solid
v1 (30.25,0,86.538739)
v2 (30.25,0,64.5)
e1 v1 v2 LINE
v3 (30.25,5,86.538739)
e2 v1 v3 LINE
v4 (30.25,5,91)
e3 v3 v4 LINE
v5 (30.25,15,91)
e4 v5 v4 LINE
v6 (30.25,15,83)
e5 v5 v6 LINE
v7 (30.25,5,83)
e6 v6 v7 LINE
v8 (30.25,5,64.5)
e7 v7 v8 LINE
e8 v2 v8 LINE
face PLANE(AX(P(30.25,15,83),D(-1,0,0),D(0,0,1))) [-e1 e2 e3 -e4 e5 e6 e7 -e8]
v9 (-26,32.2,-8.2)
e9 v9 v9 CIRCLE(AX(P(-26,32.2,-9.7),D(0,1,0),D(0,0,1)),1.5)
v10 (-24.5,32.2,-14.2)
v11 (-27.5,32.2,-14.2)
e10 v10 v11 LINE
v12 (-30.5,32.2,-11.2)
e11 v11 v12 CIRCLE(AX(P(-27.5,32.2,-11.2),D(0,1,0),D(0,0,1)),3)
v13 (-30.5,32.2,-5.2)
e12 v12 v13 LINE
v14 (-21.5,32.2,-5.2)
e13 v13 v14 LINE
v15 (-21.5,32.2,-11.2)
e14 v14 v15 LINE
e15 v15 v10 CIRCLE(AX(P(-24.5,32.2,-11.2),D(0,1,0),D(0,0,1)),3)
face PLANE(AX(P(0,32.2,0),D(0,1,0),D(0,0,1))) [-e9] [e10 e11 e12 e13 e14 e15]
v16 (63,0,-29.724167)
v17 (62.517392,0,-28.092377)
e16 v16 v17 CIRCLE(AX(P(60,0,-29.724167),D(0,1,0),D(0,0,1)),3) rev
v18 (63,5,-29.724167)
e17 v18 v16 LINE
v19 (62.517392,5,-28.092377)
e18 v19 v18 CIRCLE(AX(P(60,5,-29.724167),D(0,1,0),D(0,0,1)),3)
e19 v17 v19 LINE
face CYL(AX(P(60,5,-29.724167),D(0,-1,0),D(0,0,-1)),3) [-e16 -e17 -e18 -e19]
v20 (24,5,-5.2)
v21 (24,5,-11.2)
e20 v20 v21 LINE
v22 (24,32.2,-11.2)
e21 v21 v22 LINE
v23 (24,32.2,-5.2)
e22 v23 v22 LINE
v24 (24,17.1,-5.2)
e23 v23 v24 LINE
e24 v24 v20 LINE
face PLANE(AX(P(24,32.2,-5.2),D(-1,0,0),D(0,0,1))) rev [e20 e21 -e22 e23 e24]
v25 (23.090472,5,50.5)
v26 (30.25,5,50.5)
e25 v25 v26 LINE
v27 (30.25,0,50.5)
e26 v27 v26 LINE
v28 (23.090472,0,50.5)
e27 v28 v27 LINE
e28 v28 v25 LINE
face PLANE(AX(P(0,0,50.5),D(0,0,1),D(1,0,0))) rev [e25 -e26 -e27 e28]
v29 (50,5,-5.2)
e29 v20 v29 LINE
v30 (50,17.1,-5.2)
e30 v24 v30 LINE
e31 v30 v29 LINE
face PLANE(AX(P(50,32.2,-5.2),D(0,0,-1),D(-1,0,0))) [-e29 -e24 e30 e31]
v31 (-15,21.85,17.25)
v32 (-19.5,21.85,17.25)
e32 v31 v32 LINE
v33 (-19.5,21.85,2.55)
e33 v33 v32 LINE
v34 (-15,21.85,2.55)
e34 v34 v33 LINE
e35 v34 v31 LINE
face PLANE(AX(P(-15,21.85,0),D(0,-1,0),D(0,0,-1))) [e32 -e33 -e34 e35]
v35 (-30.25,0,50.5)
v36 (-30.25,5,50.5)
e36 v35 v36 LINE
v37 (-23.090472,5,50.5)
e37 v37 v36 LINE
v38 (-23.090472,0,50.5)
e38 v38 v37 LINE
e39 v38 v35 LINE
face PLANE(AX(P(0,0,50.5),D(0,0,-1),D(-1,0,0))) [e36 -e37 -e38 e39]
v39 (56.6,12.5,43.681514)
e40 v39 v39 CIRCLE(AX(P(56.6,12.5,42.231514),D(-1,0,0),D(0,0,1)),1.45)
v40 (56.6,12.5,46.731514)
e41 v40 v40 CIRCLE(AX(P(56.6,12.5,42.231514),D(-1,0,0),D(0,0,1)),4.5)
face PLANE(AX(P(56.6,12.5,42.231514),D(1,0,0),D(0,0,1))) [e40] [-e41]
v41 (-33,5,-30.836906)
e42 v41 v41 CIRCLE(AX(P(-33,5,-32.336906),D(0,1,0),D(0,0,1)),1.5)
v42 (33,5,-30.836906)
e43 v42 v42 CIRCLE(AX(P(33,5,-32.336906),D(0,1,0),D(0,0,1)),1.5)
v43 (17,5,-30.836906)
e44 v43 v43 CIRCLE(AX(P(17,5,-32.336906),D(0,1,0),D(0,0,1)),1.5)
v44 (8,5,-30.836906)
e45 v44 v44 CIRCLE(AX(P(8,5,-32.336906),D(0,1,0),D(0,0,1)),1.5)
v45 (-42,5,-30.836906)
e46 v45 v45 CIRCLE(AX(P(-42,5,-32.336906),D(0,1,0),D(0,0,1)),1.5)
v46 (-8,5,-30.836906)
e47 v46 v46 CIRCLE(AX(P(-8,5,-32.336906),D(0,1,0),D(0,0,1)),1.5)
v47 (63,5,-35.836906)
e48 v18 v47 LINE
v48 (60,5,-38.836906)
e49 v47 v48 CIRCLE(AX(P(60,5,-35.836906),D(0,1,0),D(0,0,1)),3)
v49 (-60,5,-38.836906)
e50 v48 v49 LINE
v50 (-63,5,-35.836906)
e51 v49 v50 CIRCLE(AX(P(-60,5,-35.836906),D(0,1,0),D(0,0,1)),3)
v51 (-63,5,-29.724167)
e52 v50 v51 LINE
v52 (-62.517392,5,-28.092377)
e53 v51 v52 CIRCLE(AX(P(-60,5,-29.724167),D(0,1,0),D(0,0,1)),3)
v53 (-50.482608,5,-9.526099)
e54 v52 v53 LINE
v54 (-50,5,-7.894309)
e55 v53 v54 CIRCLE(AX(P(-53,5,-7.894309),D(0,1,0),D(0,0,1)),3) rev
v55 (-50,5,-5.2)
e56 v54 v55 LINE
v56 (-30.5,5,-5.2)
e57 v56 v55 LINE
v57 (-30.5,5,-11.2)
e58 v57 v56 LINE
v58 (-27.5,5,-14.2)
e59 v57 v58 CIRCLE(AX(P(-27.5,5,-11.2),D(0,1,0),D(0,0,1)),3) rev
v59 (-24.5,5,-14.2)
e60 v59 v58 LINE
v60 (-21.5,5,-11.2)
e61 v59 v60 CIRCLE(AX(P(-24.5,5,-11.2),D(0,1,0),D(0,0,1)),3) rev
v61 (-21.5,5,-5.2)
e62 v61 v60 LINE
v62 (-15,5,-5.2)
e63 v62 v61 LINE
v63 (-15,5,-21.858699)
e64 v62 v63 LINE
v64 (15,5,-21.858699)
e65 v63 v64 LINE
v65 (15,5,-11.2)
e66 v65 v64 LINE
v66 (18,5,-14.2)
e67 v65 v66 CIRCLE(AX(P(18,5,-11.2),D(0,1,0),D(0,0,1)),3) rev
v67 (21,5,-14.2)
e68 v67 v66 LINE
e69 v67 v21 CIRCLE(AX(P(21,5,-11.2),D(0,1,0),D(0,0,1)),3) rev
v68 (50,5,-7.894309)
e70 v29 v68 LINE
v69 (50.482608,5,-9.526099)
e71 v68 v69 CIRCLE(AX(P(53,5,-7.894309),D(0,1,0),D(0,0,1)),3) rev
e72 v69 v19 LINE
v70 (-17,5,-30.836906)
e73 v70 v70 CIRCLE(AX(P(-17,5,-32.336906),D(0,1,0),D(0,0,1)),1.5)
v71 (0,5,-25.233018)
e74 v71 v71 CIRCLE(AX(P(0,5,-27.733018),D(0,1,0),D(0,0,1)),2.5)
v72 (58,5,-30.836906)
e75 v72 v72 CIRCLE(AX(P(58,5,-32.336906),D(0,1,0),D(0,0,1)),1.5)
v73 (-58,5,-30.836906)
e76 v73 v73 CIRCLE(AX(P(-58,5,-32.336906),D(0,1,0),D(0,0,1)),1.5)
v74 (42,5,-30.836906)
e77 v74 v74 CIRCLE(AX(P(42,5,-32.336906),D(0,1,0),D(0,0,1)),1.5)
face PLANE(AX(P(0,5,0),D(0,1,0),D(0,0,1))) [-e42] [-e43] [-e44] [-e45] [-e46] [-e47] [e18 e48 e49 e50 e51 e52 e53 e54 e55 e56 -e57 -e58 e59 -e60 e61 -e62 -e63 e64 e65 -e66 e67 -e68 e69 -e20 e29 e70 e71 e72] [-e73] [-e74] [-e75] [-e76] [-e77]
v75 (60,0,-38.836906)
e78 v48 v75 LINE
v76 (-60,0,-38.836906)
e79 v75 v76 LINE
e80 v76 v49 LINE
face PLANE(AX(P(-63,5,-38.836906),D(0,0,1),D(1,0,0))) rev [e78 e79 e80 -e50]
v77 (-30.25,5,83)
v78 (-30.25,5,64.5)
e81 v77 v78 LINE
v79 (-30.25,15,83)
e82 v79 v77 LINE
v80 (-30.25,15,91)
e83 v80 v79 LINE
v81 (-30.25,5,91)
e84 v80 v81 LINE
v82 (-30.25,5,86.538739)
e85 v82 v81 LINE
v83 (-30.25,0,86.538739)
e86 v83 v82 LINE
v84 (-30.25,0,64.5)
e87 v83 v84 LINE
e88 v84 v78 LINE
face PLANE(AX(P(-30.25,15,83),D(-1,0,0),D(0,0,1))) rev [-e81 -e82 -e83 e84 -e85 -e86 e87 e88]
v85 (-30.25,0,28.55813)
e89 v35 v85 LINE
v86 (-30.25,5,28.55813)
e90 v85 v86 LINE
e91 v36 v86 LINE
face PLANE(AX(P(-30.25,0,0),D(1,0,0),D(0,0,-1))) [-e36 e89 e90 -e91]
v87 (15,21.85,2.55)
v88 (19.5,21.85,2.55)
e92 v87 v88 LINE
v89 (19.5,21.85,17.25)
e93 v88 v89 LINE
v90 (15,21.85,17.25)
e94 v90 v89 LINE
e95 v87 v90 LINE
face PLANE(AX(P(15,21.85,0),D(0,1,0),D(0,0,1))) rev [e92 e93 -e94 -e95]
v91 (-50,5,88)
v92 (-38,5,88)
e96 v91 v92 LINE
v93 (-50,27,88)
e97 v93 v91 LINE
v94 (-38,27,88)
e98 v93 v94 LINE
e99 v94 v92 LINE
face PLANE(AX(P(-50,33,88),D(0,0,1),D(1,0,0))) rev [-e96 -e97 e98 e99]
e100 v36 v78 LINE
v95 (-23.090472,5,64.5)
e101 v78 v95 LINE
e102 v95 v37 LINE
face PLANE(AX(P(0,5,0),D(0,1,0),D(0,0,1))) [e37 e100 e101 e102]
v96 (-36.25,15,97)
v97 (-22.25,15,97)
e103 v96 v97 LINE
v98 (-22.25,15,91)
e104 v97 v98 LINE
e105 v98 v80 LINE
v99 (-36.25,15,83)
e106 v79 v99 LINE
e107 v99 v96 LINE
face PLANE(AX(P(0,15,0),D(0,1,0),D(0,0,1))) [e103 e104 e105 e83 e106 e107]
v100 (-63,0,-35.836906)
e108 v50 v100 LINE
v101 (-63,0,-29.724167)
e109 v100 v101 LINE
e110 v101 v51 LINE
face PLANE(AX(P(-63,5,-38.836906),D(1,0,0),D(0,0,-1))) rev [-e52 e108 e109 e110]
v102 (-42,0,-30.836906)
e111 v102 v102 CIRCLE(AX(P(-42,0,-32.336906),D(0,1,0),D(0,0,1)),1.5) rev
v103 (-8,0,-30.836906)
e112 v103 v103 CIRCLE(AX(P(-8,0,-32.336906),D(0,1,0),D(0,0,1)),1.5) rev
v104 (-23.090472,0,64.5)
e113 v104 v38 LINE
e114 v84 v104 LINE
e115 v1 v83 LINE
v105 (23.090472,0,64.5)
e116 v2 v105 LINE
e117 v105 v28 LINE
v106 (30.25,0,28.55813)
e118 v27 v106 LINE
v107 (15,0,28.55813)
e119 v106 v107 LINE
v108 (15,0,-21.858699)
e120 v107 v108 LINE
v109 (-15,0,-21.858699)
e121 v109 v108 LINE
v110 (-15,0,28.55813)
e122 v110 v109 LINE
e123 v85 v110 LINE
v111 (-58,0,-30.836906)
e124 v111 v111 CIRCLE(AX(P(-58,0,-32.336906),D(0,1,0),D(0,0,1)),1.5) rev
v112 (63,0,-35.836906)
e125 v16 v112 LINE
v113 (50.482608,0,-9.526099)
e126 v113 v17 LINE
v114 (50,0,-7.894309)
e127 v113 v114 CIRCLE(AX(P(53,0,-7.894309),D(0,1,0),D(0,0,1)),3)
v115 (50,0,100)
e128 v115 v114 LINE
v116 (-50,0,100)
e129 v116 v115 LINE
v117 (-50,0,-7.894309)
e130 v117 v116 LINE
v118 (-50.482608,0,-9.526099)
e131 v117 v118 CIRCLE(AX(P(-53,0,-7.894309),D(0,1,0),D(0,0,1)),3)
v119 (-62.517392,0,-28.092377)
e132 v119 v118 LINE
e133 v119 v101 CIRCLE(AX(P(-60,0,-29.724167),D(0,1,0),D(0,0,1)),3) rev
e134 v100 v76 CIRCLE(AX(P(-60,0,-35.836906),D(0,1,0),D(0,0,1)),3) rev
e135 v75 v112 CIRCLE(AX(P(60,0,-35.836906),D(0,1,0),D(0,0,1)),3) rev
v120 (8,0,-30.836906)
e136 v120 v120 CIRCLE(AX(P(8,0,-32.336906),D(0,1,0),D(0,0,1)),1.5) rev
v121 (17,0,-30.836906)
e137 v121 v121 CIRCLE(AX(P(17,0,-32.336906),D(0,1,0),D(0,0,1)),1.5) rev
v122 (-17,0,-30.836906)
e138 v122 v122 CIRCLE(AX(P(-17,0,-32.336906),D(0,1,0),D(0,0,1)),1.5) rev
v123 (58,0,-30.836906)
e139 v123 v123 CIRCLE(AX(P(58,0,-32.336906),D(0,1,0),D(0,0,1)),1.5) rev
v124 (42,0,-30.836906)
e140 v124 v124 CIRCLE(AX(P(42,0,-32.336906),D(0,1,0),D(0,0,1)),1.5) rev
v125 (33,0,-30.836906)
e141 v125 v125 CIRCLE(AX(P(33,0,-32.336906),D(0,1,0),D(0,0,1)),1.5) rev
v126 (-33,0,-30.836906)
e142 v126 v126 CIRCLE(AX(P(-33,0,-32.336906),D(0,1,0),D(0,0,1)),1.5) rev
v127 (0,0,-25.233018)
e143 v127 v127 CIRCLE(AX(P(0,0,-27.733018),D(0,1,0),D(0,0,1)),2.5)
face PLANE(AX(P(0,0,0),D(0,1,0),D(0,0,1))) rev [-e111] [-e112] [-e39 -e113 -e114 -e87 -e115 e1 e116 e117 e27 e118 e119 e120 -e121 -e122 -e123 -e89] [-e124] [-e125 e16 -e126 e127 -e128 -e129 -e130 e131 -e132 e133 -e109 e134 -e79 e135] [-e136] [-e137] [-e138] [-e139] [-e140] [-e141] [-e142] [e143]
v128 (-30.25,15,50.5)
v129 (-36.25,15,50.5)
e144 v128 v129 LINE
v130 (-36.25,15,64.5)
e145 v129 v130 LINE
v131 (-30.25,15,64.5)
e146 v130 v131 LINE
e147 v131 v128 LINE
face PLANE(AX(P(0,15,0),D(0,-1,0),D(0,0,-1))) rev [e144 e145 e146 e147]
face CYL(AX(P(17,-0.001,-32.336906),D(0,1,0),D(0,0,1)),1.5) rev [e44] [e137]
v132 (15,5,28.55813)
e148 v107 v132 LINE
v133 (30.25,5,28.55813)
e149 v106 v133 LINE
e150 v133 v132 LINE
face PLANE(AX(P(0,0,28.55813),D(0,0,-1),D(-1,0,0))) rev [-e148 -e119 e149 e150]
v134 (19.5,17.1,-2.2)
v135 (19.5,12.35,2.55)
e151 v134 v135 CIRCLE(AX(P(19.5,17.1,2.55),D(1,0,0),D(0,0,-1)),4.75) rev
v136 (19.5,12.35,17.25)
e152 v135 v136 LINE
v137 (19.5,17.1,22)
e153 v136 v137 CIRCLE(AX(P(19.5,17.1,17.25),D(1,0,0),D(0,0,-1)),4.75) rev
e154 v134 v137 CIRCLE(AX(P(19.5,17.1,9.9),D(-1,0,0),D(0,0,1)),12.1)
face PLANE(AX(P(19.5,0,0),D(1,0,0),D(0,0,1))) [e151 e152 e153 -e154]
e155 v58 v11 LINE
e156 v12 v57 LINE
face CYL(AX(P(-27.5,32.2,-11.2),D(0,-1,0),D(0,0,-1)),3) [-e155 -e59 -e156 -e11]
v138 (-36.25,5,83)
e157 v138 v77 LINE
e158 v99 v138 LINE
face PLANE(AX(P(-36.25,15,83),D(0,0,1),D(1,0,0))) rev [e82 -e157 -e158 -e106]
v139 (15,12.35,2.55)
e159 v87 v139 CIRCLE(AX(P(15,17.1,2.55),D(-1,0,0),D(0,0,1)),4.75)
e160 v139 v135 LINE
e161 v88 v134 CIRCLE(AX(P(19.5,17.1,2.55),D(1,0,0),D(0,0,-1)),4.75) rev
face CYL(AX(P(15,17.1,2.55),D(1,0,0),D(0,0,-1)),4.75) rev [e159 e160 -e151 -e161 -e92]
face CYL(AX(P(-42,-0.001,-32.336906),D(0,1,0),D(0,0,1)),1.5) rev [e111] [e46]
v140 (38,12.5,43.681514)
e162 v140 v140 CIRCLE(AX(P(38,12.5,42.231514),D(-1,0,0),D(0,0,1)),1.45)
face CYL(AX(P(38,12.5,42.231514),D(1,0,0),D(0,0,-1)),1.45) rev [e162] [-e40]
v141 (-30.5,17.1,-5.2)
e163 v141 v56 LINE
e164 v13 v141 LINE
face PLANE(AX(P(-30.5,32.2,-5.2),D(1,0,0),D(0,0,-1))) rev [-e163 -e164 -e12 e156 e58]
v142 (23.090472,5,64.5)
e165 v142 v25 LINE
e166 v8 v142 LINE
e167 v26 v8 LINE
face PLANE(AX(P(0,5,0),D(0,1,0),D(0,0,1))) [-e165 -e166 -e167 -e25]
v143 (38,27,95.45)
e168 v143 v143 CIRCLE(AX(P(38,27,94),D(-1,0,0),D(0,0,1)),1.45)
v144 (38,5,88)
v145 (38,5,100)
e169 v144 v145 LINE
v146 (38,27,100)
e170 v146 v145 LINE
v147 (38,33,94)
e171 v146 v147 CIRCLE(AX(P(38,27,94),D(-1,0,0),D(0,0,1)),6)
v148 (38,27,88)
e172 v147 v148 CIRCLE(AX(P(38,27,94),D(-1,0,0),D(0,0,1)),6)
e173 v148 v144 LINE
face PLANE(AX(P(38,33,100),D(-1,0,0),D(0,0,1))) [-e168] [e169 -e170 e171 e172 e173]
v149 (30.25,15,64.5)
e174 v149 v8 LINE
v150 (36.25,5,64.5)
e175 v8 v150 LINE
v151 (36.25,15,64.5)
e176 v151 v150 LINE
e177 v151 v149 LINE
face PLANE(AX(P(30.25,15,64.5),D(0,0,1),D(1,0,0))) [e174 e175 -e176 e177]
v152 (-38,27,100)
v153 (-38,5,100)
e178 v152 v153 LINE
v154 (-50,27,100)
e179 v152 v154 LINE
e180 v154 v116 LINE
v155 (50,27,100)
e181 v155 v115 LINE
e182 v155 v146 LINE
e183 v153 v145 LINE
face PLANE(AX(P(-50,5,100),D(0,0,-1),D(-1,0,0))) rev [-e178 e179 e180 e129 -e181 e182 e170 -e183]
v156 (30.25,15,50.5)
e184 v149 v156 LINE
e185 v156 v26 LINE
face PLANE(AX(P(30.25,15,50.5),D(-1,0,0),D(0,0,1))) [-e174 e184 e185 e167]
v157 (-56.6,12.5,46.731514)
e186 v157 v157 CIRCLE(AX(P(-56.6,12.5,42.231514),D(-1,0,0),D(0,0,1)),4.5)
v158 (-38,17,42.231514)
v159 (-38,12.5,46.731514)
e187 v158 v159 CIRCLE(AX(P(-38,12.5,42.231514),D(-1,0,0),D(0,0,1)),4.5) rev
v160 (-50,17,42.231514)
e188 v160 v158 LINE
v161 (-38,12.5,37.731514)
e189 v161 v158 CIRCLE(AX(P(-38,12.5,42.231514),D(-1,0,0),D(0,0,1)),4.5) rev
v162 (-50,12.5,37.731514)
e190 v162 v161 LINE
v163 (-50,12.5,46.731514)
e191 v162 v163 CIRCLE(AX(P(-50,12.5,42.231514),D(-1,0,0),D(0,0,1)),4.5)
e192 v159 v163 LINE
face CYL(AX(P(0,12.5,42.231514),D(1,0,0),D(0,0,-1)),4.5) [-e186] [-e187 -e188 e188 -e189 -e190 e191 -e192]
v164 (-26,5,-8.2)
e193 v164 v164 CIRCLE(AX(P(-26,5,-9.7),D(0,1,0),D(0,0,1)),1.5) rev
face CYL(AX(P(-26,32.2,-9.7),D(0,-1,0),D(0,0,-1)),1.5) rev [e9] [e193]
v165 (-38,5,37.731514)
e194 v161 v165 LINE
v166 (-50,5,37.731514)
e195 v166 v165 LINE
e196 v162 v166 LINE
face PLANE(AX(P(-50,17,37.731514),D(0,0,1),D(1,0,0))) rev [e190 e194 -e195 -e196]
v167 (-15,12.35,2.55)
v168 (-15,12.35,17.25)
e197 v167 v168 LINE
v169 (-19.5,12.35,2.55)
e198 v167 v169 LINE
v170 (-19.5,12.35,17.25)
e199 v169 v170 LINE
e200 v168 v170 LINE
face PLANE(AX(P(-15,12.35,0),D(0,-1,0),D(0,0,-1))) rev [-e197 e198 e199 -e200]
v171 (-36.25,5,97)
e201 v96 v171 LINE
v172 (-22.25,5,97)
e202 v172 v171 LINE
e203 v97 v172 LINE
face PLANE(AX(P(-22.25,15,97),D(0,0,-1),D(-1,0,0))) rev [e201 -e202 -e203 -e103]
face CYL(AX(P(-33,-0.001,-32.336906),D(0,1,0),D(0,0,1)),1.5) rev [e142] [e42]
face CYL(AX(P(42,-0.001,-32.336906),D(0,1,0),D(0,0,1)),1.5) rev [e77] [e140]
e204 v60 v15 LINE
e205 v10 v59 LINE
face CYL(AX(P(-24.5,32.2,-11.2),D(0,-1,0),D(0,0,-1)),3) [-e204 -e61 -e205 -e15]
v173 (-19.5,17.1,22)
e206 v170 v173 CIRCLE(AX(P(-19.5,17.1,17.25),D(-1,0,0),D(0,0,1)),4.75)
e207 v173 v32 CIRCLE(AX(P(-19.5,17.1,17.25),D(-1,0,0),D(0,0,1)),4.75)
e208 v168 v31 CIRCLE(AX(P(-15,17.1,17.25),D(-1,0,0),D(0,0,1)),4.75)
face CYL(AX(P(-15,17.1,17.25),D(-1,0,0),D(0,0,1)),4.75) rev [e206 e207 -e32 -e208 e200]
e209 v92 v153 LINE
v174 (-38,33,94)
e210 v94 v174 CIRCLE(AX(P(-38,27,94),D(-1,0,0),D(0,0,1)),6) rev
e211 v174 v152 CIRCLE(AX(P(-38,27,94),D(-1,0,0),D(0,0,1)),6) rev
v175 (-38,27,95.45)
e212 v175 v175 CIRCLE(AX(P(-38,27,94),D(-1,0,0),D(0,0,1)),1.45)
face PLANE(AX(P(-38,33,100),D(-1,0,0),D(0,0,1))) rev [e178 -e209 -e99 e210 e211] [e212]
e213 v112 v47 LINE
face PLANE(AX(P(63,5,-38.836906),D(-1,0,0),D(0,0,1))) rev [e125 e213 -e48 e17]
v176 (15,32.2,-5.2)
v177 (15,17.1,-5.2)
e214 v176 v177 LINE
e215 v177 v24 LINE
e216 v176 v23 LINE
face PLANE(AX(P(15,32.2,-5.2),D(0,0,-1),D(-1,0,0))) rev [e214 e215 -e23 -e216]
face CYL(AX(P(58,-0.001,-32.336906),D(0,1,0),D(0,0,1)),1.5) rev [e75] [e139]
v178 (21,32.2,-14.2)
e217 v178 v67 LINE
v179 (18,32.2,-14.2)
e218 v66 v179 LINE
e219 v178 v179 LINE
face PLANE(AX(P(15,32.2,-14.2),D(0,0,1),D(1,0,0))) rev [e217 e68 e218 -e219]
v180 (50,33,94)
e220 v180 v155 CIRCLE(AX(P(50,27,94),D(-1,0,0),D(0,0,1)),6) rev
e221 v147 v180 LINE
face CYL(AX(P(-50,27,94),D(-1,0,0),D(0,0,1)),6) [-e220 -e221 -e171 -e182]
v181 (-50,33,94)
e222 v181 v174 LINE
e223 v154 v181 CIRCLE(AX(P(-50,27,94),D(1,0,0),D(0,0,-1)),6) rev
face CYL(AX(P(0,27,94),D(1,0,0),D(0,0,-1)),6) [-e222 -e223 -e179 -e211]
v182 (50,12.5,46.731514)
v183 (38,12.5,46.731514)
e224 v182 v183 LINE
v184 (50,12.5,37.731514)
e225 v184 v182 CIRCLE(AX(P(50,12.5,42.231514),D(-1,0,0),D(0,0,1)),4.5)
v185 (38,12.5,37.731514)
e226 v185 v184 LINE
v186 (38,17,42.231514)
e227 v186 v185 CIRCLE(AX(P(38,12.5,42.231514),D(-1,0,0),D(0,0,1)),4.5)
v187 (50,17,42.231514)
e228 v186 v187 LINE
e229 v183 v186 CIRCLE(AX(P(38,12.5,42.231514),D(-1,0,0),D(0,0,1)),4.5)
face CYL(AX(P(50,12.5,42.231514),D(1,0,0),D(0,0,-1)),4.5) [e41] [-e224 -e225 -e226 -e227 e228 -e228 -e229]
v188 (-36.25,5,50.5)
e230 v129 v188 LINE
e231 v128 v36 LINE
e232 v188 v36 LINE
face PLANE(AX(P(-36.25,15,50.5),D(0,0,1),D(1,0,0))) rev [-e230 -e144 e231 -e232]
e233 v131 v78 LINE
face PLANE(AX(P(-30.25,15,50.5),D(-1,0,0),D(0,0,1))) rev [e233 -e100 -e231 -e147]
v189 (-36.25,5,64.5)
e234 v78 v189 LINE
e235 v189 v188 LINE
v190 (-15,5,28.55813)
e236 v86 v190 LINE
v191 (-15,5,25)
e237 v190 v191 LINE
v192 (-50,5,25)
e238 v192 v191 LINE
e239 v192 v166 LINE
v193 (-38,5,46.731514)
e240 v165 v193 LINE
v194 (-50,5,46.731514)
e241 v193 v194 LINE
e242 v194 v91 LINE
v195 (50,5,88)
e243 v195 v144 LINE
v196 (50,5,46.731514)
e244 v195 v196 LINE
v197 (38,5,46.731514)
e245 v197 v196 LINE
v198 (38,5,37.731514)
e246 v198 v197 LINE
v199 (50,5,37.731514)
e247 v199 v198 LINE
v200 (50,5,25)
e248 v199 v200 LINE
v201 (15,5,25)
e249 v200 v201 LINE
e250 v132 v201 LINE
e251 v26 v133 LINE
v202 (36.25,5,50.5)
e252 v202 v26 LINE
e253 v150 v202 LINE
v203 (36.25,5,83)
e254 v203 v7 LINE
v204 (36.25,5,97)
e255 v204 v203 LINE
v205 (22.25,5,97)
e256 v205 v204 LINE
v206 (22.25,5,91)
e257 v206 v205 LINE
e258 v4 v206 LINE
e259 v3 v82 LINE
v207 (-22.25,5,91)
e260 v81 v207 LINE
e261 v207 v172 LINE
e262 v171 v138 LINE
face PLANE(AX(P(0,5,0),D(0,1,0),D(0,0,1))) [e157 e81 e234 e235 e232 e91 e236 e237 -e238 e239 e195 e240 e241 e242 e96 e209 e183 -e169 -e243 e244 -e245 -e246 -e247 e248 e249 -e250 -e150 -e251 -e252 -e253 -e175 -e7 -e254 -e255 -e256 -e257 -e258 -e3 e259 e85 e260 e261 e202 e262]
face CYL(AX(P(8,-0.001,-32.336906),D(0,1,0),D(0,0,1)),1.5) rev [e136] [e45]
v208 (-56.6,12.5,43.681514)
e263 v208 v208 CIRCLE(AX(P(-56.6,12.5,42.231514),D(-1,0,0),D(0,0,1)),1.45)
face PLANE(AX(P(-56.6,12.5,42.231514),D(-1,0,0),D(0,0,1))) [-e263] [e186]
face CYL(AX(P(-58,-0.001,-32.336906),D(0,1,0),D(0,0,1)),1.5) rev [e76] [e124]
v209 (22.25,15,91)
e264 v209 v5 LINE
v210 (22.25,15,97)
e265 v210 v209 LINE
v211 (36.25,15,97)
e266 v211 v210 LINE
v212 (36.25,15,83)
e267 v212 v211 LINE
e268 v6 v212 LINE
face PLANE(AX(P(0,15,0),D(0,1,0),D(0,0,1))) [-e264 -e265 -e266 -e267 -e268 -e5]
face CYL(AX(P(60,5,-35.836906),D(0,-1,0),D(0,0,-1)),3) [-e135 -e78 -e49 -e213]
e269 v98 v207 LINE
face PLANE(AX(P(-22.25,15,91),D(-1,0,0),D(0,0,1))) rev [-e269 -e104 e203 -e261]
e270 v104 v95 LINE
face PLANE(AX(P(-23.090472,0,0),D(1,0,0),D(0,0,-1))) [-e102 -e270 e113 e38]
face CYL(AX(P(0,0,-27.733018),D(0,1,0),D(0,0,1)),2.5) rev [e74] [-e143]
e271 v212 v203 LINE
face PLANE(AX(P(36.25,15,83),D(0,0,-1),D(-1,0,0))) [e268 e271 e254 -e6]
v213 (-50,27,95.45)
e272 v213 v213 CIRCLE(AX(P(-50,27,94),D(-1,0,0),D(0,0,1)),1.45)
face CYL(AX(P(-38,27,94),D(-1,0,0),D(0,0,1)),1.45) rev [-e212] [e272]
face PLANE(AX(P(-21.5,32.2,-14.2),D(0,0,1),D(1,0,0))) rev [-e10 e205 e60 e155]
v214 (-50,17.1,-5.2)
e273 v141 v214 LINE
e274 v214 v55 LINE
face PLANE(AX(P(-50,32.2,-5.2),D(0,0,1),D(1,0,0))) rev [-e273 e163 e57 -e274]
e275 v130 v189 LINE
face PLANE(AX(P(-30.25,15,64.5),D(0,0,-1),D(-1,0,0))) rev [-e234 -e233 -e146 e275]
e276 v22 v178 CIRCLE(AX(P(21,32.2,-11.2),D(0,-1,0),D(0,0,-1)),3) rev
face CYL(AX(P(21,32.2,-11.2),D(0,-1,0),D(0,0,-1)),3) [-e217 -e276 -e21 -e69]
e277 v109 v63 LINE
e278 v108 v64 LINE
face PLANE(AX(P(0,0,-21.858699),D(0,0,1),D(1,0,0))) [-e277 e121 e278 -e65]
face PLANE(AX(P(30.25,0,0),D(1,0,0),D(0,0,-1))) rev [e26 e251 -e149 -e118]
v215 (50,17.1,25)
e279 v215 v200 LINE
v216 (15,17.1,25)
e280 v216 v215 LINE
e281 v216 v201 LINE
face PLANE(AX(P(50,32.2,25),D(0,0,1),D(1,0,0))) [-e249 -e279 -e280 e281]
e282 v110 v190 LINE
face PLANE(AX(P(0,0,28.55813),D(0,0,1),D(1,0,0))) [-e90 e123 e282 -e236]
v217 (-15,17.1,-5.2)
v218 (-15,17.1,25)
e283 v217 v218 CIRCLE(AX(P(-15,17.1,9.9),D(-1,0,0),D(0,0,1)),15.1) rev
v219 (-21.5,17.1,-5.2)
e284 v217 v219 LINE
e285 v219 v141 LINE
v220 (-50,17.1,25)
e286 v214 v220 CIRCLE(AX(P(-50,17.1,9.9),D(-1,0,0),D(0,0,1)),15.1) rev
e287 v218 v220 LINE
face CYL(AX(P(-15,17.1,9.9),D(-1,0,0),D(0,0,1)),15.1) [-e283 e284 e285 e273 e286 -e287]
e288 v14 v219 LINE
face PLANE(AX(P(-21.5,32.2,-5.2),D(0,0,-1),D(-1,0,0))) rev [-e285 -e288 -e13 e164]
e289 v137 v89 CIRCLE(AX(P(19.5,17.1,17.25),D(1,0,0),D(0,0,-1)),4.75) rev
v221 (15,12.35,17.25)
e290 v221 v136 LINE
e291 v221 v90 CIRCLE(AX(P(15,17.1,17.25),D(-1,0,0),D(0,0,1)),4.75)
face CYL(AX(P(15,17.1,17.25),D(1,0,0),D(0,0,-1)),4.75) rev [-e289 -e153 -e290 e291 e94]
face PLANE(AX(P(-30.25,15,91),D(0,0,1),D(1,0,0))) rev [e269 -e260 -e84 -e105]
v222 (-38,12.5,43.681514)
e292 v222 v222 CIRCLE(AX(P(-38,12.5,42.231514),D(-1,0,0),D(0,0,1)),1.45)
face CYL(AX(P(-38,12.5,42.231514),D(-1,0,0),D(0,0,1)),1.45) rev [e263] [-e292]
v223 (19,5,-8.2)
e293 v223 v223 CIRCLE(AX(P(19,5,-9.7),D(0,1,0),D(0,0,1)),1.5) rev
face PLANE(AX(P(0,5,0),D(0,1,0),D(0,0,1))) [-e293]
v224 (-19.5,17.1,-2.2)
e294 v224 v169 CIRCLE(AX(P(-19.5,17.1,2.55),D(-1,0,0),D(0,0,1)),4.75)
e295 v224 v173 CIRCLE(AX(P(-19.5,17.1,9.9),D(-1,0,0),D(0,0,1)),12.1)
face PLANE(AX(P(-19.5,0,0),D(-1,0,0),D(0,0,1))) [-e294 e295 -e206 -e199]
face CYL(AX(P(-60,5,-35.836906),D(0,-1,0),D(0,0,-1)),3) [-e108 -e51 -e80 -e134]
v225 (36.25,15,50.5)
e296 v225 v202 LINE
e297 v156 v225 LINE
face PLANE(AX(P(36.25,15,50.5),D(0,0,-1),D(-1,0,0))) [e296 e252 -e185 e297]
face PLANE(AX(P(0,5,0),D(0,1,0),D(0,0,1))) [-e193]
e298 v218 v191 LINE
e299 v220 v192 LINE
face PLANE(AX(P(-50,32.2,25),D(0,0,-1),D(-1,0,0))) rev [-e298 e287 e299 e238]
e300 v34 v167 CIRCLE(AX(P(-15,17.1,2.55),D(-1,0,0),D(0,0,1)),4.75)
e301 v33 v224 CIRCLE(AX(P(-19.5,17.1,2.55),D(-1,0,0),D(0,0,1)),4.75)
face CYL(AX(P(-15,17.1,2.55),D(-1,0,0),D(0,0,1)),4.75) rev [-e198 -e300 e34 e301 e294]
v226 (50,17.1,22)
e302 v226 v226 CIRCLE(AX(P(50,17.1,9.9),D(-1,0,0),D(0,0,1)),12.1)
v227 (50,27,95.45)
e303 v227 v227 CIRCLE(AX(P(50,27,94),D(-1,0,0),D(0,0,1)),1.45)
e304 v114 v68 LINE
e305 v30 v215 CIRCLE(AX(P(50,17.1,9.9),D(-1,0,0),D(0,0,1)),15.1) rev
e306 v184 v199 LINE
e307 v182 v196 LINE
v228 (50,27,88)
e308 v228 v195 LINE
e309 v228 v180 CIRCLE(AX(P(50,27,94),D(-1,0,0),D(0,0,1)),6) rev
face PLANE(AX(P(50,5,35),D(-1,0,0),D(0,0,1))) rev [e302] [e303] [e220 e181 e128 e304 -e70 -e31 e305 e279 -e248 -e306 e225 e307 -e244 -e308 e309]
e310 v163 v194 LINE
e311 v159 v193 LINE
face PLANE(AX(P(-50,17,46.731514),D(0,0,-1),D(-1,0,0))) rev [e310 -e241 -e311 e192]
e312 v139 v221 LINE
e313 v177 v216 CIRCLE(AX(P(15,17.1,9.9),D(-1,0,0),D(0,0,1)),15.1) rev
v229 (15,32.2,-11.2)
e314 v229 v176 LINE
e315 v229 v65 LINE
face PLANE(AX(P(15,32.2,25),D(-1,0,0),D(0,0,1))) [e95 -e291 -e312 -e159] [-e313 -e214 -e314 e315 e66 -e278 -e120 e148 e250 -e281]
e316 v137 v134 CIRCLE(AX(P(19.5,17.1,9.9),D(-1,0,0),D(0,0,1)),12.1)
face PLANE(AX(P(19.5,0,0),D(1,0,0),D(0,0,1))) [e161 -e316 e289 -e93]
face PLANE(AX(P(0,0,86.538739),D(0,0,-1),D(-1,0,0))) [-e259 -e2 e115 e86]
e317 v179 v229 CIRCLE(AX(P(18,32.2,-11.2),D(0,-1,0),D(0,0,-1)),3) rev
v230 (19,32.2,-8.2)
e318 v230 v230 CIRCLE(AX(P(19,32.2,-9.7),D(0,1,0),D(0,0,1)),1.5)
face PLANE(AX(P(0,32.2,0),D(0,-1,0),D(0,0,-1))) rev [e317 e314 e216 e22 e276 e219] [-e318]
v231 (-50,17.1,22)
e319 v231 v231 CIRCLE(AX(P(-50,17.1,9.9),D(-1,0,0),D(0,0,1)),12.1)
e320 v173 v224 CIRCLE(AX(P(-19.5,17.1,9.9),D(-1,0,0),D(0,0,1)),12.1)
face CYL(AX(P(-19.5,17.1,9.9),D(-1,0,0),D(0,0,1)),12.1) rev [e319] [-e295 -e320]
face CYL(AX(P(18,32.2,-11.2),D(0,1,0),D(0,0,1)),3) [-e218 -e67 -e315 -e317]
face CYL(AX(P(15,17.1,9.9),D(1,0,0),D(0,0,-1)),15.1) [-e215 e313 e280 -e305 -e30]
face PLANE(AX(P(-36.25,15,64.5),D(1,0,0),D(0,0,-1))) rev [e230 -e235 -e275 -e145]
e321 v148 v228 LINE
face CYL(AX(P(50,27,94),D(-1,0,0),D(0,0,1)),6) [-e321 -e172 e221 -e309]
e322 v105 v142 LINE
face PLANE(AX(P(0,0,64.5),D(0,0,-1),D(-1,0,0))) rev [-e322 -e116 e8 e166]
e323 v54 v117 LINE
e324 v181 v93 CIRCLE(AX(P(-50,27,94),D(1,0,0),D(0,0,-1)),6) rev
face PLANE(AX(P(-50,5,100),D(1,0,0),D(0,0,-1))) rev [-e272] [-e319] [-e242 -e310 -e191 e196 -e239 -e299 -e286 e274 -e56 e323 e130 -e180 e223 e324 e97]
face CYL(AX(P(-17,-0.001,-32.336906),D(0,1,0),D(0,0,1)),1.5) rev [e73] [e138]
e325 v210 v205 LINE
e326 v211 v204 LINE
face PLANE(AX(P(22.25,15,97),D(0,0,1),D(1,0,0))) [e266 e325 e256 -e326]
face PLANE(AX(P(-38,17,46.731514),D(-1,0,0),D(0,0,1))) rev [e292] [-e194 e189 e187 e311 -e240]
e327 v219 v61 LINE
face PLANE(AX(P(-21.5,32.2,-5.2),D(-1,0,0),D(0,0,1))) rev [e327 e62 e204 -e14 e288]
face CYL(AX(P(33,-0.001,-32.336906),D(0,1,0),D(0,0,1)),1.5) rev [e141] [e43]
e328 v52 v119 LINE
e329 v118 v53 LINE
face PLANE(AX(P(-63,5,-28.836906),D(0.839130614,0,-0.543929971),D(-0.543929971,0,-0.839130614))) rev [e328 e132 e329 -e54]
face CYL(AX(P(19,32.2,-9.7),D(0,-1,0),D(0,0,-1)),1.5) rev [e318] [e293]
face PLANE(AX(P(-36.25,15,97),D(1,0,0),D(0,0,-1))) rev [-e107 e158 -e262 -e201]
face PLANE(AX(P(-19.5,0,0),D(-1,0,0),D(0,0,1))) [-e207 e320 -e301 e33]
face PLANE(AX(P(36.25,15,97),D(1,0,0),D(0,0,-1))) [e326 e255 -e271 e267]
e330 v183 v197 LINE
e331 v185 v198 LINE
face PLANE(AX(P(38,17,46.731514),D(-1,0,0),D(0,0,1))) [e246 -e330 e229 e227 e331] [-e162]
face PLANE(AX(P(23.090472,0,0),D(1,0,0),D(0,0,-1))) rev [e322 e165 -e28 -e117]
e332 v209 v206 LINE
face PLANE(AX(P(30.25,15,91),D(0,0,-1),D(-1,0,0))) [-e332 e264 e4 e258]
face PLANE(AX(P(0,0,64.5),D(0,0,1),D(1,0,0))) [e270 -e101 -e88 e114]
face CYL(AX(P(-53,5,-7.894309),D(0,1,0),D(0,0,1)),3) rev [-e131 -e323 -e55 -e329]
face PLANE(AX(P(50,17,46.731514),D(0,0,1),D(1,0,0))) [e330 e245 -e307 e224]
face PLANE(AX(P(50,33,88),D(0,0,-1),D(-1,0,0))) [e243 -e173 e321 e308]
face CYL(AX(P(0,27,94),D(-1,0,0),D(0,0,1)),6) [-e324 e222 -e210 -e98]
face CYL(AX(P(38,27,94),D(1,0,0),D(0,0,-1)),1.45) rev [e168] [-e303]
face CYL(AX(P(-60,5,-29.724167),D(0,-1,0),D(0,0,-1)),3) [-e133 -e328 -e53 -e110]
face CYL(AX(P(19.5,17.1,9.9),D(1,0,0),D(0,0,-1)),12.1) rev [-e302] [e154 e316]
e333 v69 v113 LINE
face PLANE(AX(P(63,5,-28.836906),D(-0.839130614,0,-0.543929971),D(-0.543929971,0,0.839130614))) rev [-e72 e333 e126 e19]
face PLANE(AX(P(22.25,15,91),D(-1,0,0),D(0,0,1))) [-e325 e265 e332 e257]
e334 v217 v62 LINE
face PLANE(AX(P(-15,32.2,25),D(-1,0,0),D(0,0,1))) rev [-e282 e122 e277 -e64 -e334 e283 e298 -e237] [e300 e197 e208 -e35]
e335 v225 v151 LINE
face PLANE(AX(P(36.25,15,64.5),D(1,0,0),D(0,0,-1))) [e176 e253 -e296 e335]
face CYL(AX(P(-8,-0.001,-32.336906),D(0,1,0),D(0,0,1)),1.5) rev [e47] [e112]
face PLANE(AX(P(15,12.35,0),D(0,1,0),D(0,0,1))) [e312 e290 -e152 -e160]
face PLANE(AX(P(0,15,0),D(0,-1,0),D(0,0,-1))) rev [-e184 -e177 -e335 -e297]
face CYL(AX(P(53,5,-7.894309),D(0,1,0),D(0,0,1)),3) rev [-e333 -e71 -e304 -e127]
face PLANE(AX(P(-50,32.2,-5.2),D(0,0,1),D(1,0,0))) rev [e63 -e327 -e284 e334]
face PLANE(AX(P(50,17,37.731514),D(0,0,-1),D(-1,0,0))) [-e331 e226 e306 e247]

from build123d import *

# Parameters (mm, degrees)
BOSS_EXTRUDE1_DEPTH    = 5
FILLET1_R              = 3
SKETCH3_W              = 35
SKETCH3_H              = 30.2
BOSS_EXTRUDE2_DEPTH    = 27.2
CUT_EXTRUDE1_START     = -50
CUT_EXTRUDE1_DEPTH     = 35
CUT_EXTRUDE2_START     = -50
CUT_EXTRUDE2_OUTLINE_R = 12.1
CUT_EXTRUDE2_DEPTH     = 30.5
CUT_EXTRUDE3_DEPTH     = 35
SKETCH6_W              = 12
SKETCH6_H              = 9
BOSS_EXTRUDE3_DEPTH    = 17
FILLET2_R              = 4.5
SKETCH9_R              = 4.5
BOSS_EXTRUDE5_DEPTH    = 6.6
SKETCH10_R             = 1.45
CUT_EXTRUDE5_DEPTH     = 18.6
FILLET2_OF_MIRROR11_R  = 4.5
SKETCH11_W             = 12
SKETCH11_H             = 12
BOSS_EXTRUDE6_DEPTH    = 33
FILLET3_R              = 6
SKETCH12_R             = 1.45
CUT_EXTRUDE6_DEPTH     = 12
FILLET3_OF_MIRROR12_R  = 6
BOSS_EXTRUDE8_DEPTH    = 15
SKETCH16_W             = 6
SKETCH16_H             = 14
BOSS_EXTRUDE9_DEPTH    = 15
CUT_EXTRUDE7_REACH     = 123.462
SKETCH17_R             = 1.5
CUT_EXTRUDE8_DEPTH     = 122.461928192
SKETCH19_R             = 2.5
CUT_EXTRUDE9_DEPTH     = 122.461928192
SKETCH22_W             = 9
SKETCH22_H             = 9
SKETCH22_R             = 1.5
BOSS_EXTRUDE11_DEPTH   = 27.2
FILLET4_R              = 3


# Read off the part's stored shape, not the designer's step: Cut-Extrude1, Cut-Extrude2
with BuildPart() as part:
    # Sketch1 → Boss-Extrude1 (new body)
    with BuildSketch(Plane(origin=(0, 0, 0), x_dir=(1, 0, 0), z_dir=(0, 1, 0))):
        Polygon((-50, -100), (50, -100), (50, -50), (50, -35), (50, 8.781570318), (63, 28.83690568), (63, 38.83690568), (50, 38.83690568), (-50, 38.83690568), (-63, 38.83690568), (-63, 28.83690568), (-50, 8.781570318), (-50, -35), (-50, -50), align=None)
    extrude(amount=BOSS_EXTRUDE1_DEPTH)

    # Fillet1
    fillet1_edges = [part.edges().sort_by_distance(p)[0] for p in [
        (63, 2.5, -38.83690568),
        (63, 2.5, -28.83690568),
        (50, 2.5, -8.781570318),
        (-50, 2.5, -8.781570318),
        (-63, 2.5, -28.83690568),
        (-63, 2.5, -38.83690568),
    ]]
    fillet(fillet1_edges, radius=FILLET1_R)

    # Sketch3 → Boss-Extrude2 (add)
    with BuildSketch(Plane(origin=(0, 5, 0), x_dir=(1, 0, 0), z_dir=(0, 1, 0))):
        with Locations((-32.5, -9.9)):
            Rectangle(SKETCH3_W, SKETCH3_H)
    boss_extrude2 = extrude(amount=BOSS_EXTRUDE2_DEPTH)

    # Cut-Extrude1 outline → Cut-Extrude1 (cut)
    with BuildSketch(Plane.YZ.offset(CUT_EXTRUDE1_START)):
        with BuildLine():
            Line((32.2, 25), (17.1, 25))
            ThreePointArc((17.1, 25), (27.777312396, 20.577312396), (32.2, 9.9))
            Line((32.2, 9.9), (32.2, 25))
        make_face()
        with BuildLine():
            Line((32.2, -5.2), (32.2, 9.9))
            ThreePointArc((32.2, 9.9), (27.777312396, -0.777312396), (17.1, -5.2))
            Line((17.1, -5.2), (32.2, -5.2))
        make_face()
    cut_extrude1 = extrude(amount=CUT_EXTRUDE1_DEPTH, mode=Mode.SUBTRACT)

    # Cut-Extrude2 outline → Cut-Extrude2 (cut)
    with BuildSketch(Plane.YZ.offset(CUT_EXTRUDE2_START)):
        with Locations((17.1, 9.9)):
            Circle(CUT_EXTRUDE2_OUTLINE_R)
    cut_extrude2 = extrude(amount=CUT_EXTRUDE2_DEPTH, mode=Mode.SUBTRACT)

    # Sketch4<4> → Cut-Extrude3 (cut)
    with BuildSketch(Plane.ZY.offset(50)):
        with BuildLine():
            Line((2.55, 21.85), (17.25, 21.85))
            ThreePointArc((17.25, 21.85), (22, 17.1), (17.25, 12.35))
            Line((17.25, 12.35), (2.55, 12.35))
            ThreePointArc((2.55, 12.35), (-2.2, 17.1), (2.55, 21.85))
        make_face()
    cut_extrude3 = extrude(amount=-CUT_EXTRUDE3_DEPTH, mode=Mode.SUBTRACT)

    # Mirror16: Boss-Extrude2, Cut-Extrude1, Cut-Extrude2, Cut-Extrude3 across plane
    add(boss_extrude2.mirror(Plane(origin=(0, 0, 0), x_dir=(0, 0, 1), z_dir=(1, 0, 0))))
    add(cut_extrude1.mirror(Plane(origin=(0, 0, 0), x_dir=(0, 0, 1), z_dir=(1, 0, 0))), mode=Mode.SUBTRACT)
    add(cut_extrude2.mirror(Plane(origin=(0, 0, 0), x_dir=(0, 0, 1), z_dir=(1, 0, 0))), mode=Mode.SUBTRACT)
    add(cut_extrude3.mirror(Plane(origin=(0, 0, 0), x_dir=(0, 0, 1), z_dir=(1, 0, 0))), mode=Mode.SUBTRACT)

    # Sketch6 → Boss-Extrude3 (add)
    with BuildSketch(Plane(origin=(0, 0, 0), x_dir=(1, 0, 0), z_dir=(0, 1, 0))):
        with Locations((-44, -42.231514294)):
            Rectangle(SKETCH6_W, SKETCH6_H)
    boss_extrude3 = extrude(amount=BOSS_EXTRUDE3_DEPTH)

    # Fillet2
    fillet2_edges = [part.edges().sort_by_distance(p)[0] for p in [
        (-44, 17, 37.731514294),
        (-44, 17, 46.731514294),
    ]]
    fillet(fillet2_edges, radius=FILLET2_R - 0.0001)  # a hair under: the kernel refuses the full size

    # Sketch9 → Boss-Extrude5 (add)
    with BuildSketch(Plane.ZY.offset(50)):
        with Locations((42.231514294, 12.5)):
            Circle(SKETCH9_R)
    boss_extrude5 = extrude(amount=BOSS_EXTRUDE5_DEPTH)

    # Sketch10 → Cut-Extrude5 (cut)
    with BuildSketch(Plane.ZY.offset(56.6)):
        with Locations((42.231514294, 12.5)):
            Circle(SKETCH10_R)
    cut_extrude5 = extrude(amount=-CUT_EXTRUDE5_DEPTH, mode=Mode.SUBTRACT)

    # Mirror11: Boss-Extrude3, Boss-Extrude5, Cut-Extrude5 across plane
    add(boss_extrude3.mirror(Plane(origin=(0, 0, 0), x_dir=(0, 0, 1), z_dir=(1, 0, 0))))
    add(boss_extrude5.mirror(Plane(origin=(0, 0, 0), x_dir=(0, 0, 1), z_dir=(1, 0, 0))))
    add(cut_extrude5.mirror(Plane(origin=(0, 0, 0), x_dir=(0, 0, 1), z_dir=(1, 0, 0))), mode=Mode.SUBTRACT)

    # Fillet2 of Mirror11
    fillet2_of_mirror11_edges = [part.edges().sort_by_distance(p)[0] for p in [
        (44, 17, 37.731514294),
        (44, 17, 46.731514294),
    ]]
    fillet(fillet2_of_mirror11_edges, radius=FILLET2_OF_MIRROR11_R - 0.0001)  # a hair under: the kernel refuses the full size

    # Sketch11 → Boss-Extrude6 (add)
    with BuildSketch(Plane(origin=(0, 0, 0), x_dir=(1, 0, 0), z_dir=(0, 1, 0))):
        with Locations((-44, -94)):
            Rectangle(SKETCH11_W, SKETCH11_H)
    boss_extrude6 = extrude(amount=BOSS_EXTRUDE6_DEPTH)

    # Fillet3
    fillet3_edges = [part.edges().sort_by_distance(p)[0] for p in [
        (-44, 33, 88),
        (-44, 33, 100),
    ]]
    fillet(fillet3_edges, radius=FILLET3_R - 0.0001)  # a hair under: the kernel refuses the full size

    # Sketch12 → Cut-Extrude6 (cut)
    with BuildSketch(Plane.ZY.offset(50)):
        with Locations((94, 27)):
            Circle(SKETCH12_R)
    cut_extrude6 = extrude(amount=-CUT_EXTRUDE6_DEPTH, mode=Mode.SUBTRACT)

    # Mirror12: Boss-Extrude6, Cut-Extrude6 across plane
    add(boss_extrude6.mirror(Plane(origin=(0, 0, 0), x_dir=(0, 0, 1), z_dir=(1, 0, 0))))
    add(cut_extrude6.mirror(Plane(origin=(0, 0, 0), x_dir=(0, 0, 1), z_dir=(1, 0, 0))), mode=Mode.SUBTRACT)

    # Fillet3 of Mirror12
    fillet3_of_mirror12_edges = [part.edges().sort_by_distance(p)[0] for p in [
        (44, 33, 88),
        (44, 33, 100),
    ]]
    fillet(fillet3_of_mirror12_edges, radius=FILLET3_OF_MIRROR12_R - 0.0001)  # a hair under: the kernel refuses the full size

    # Sketch15 → Boss-Extrude8 (add)
    with BuildSketch(Plane(origin=(0, 0, 0), x_dir=(1, 0, 0), z_dir=(0, 1, 0))):
        Polygon((-30.25, -91), (-22.25, -91), (-22.25, -97), (-36.25, -97), (-36.25, -83), (-30.25, -83), align=None)
    boss_extrude8 = extrude(amount=BOSS_EXTRUDE8_DEPTH)

    # Mirror13: Boss-Extrude8 across plane
    add(boss_extrude8.mirror(Plane(origin=(0, 0, 0), x_dir=(0, 0, 1), z_dir=(1, 0, 0))))

    # Sketch16 → Boss-Extrude9 (add)
    with BuildSketch(Plane(origin=(0, 0, 0), x_dir=(1, 0, 0), z_dir=(0, 1, 0))):
        with Locations((-33.25, -57.5)):
            Rectangle(SKETCH16_W, SKETCH16_H)
    boss_extrude9 = extrude(amount=BOSS_EXTRUDE9_DEPTH)

    # Mirror14: Boss-Extrude9 across plane
    add(boss_extrude9.mirror(Plane(origin=(0, 0, 0), x_dir=(0, 0, 1), z_dir=(1, 0, 0))))

    # Sketch17 → Cut-Extrude7 (cut, up to next)
    with BuildSketch(Plane(origin=(0, 5, 0), x_dir=(1, 0, 0), z_dir=(0, 1, 0)), mode=Mode.PRIVATE) as cut_extrude7_sk1:
        with Locations(Location((-58, 32.33690568, 0), (0, 0, 270))):
            Circle(SKETCH17_R)
    cut_extrude7_tool1 = extrude(cut_extrude7_sk1.sketch, amount=-CUT_EXTRUDE7_REACH, mode=Mode.PRIVATE) & part.part
    # Sketch17 → Cut-Extrude7 (cut, up to next)
    with BuildSketch(Plane(origin=(0, 5, 0), x_dir=(1, 0, 0), z_dir=(0, 1, 0)), mode=Mode.PRIVATE) as cut_extrude7_sk2:
        with Locations(Location((-42, 32.33690568, 0), (0, 0, 270))):
            Circle(SKETCH17_R)
    cut_extrude7_tool2 = extrude(cut_extrude7_sk2.sketch, amount=-CUT_EXTRUDE7_REACH, mode=Mode.PRIVATE) & part.part
    # Sketch17 → Cut-Extrude7 (cut, up to next)
    with BuildSketch(Plane(origin=(0, 5, 0), x_dir=(1, 0, 0), z_dir=(0, 1, 0)), mode=Mode.PRIVATE) as cut_extrude7_sk3:
        with Locations(Location((-33, 32.33690568, 0), (0, 0, 270))):
            Circle(SKETCH17_R)
    cut_extrude7_tool3 = extrude(cut_extrude7_sk3.sketch, amount=-CUT_EXTRUDE7_REACH, mode=Mode.PRIVATE) & part.part
    # Sketch17 → Cut-Extrude7 (cut, up to next)
    with BuildSketch(Plane(origin=(0, 5, 0), x_dir=(1, 0, 0), z_dir=(0, 1, 0)), mode=Mode.PRIVATE) as cut_extrude7_sk4:
        with Locations(Location((-17, 32.33690568, 0), (0, 0, 270))):
            Circle(SKETCH17_R)
    cut_extrude7_tool4 = extrude(cut_extrude7_sk4.sketch, amount=-CUT_EXTRUDE7_REACH, mode=Mode.PRIVATE) & part.part
    # Sketch17 → Cut-Extrude7 (cut, up to next)
    with BuildSketch(Plane(origin=(0, 5, 0), x_dir=(1, 0, 0), z_dir=(0, 1, 0)), mode=Mode.PRIVATE) as cut_extrude7_sk5:
        with Locations(Location((-8, 32.33690568, 0), (0, 0, 270))):
            Circle(SKETCH17_R)
    cut_extrude7_tool5 = extrude(cut_extrude7_sk5.sketch, amount=-CUT_EXTRUDE7_REACH, mode=Mode.PRIVATE) & part.part
    # Sketch17 → Cut-Extrude7 (cut, up to next)
    with BuildSketch(Plane(origin=(0, 5, 0), x_dir=(1, 0, 0), z_dir=(0, 1, 0)), mode=Mode.PRIVATE) as cut_extrude7_sk6:
        with Locations(Location((8, 32.33690568, 0), (0, 0, 270))):
            Circle(SKETCH17_R)
    cut_extrude7_tool6 = extrude(cut_extrude7_sk6.sketch, amount=-CUT_EXTRUDE7_REACH, mode=Mode.PRIVATE) & part.part
    # Sketch17 → Cut-Extrude7 (cut, up to next)
    with BuildSketch(Plane(origin=(0, 5, 0), x_dir=(1, 0, 0), z_dir=(0, 1, 0)), mode=Mode.PRIVATE) as cut_extrude7_sk7:
        with Locations(Location((17, 32.33690568, 0), (0, 0, 270))):
            Circle(SKETCH17_R)
    cut_extrude7_tool7 = extrude(cut_extrude7_sk7.sketch, amount=-CUT_EXTRUDE7_REACH, mode=Mode.PRIVATE) & part.part
    # Sketch17 → Cut-Extrude7 (cut, up to next)
    with BuildSketch(Plane(origin=(0, 5, 0), x_dir=(1, 0, 0), z_dir=(0, 1, 0)), mode=Mode.PRIVATE) as cut_extrude7_sk8:
        with Locations(Location((33, 32.33690568, 0), (0, 0, 270))):
            Circle(SKETCH17_R)
    cut_extrude7_tool8 = extrude(cut_extrude7_sk8.sketch, amount=-CUT_EXTRUDE7_REACH, mode=Mode.PRIVATE) & part.part
    # Sketch17 → Cut-Extrude7 (cut, up to next)
    with BuildSketch(Plane(origin=(0, 5, 0), x_dir=(1, 0, 0), z_dir=(0, 1, 0)), mode=Mode.PRIVATE) as cut_extrude7_sk9:
        with Locations(Location((42, 32.33690568, 0), (0, 0, 270))):
            Circle(SKETCH17_R)
    cut_extrude7_tool9 = extrude(cut_extrude7_sk9.sketch, amount=-CUT_EXTRUDE7_REACH, mode=Mode.PRIVATE) & part.part
    # Sketch17 → Cut-Extrude7 (cut, up to next)
    with BuildSketch(Plane(origin=(0, 5, 0), x_dir=(1, 0, 0), z_dir=(0, 1, 0)), mode=Mode.PRIVATE) as cut_extrude7_sk10:
        with Locations(Location((58, 32.33690568, 0), (0, 0, 270))):
            Circle(SKETCH17_R)
    cut_extrude7_tool10 = extrude(cut_extrude7_sk10.sketch, amount=-CUT_EXTRUDE7_REACH, mode=Mode.PRIVATE) & part.part
    add(cut_extrude7_tool1.solids().sort_by_distance((-58, 5, -32.336906))[0], mode=Mode.SUBTRACT)
    add(cut_extrude7_tool2.solids().sort_by_distance((-42, 5, -32.336906))[0], mode=Mode.SUBTRACT)
    add(cut_extrude7_tool3.solids().sort_by_distance((-33, 5, -32.336906))[0], mode=Mode.SUBTRACT)
    add(cut_extrude7_tool4.solids().sort_by_distance((-17, 5, -32.336906))[0], mode=Mode.SUBTRACT)
    add(cut_extrude7_tool5.solids().sort_by_distance((-8, 5, -32.336906))[0], mode=Mode.SUBTRACT)
    add(cut_extrude7_tool6.solids().sort_by_distance((8, 5, -32.336906))[0], mode=Mode.SUBTRACT)
    add(cut_extrude7_tool7.solids().sort_by_distance((17, 5, -32.336906))[0], mode=Mode.SUBTRACT)
    add(cut_extrude7_tool8.solids().sort_by_distance((33, 5, -32.336906))[0], mode=Mode.SUBTRACT)
    add(cut_extrude7_tool9.solids().sort_by_distance((42, 5, -32.336906))[0], mode=Mode.SUBTRACT)
    add(cut_extrude7_tool10.solids().sort_by_distance((58, 5, -32.336906))[0], mode=Mode.SUBTRACT)

    # Sketch18 → Cut-Extrude8 (cut, through all)
    with BuildSketch(Plane(origin=(0, 5, 0), x_dir=(1, 0, 0), z_dir=(0, 1, 0))):
        Polygon((-15, -28.55812955), (-15, 21.858699048), (15, 21.858699048), (15, -28.55812955), (30.25, -28.55812955), (30.25, -50.5), (23.090471798, -50.5), (23.090471798, -64.5), (30.25, -64.5), (30.25, -86.538738957), (15, -86.538738957), (-15, -86.538738957), (-30.25, -86.538738957), (-30.25, -64.5), (-23.090471798, -64.5), (-23.090471798, -50.5), (-30.25, -50.5), (-30.25, -28.55812955), align=None)
    extrude(amount=-CUT_EXTRUDE8_DEPTH, mode=Mode.SUBTRACT)

    # Sketch19 → Cut-Extrude9 (cut, through all)
    with BuildSketch(Plane(origin=(0, 5, 0), x_dir=(1, 0, 0), z_dir=(0, 1, 0))):
        with Locations(Location((0, 27.733018315, 0), (0, 0, 270))):
            Circle(SKETCH19_R)
    extrude(amount=-CUT_EXTRUDE9_DEPTH, mode=Mode.SUBTRACT)

    # Sketch22 → Boss-Extrude11 (add)
    # profile 1 of 2: a face of its own
    with BuildSketch(Plane(origin=(0, 5, 0), x_dir=(1, 0, 0), z_dir=(0, 1, 0))):
        with Locations((19.5, 9.7)):
            Rectangle(SKETCH22_W, SKETCH22_H)
        with Locations(Location((19, 9.7, 0), (0, 0, 270))):
            Circle(SKETCH22_R, mode=Mode.SUBTRACT)
    # profile 2 of 2: a face of its own
    with BuildSketch(Plane(origin=(0, 5, 0), x_dir=(1, 0, 0), z_dir=(0, 1, 0))):
        with Locations((-26, 9.7)):
            Rectangle(SKETCH22_W, SKETCH22_H)
        with Locations(Location((-26, 9.7, 0), (0, 0, 270))):
            Circle(SKETCH22_R, mode=Mode.SUBTRACT)
    extrude(amount=BOSS_EXTRUDE11_DEPTH)

    # Fillet4
    fillet4_edges = [part.edges().sort_by_distance(p)[0] for p in [
        (15, 18.6, -14.2),
        (24, 18.6, -14.2),
        (-21.5, 18.6, -14.2),
        (-30.5, 18.6, -14.2),
    ]]
    fillet(fillet4_edges, radius=FILLET4_R)


solid = part.part
